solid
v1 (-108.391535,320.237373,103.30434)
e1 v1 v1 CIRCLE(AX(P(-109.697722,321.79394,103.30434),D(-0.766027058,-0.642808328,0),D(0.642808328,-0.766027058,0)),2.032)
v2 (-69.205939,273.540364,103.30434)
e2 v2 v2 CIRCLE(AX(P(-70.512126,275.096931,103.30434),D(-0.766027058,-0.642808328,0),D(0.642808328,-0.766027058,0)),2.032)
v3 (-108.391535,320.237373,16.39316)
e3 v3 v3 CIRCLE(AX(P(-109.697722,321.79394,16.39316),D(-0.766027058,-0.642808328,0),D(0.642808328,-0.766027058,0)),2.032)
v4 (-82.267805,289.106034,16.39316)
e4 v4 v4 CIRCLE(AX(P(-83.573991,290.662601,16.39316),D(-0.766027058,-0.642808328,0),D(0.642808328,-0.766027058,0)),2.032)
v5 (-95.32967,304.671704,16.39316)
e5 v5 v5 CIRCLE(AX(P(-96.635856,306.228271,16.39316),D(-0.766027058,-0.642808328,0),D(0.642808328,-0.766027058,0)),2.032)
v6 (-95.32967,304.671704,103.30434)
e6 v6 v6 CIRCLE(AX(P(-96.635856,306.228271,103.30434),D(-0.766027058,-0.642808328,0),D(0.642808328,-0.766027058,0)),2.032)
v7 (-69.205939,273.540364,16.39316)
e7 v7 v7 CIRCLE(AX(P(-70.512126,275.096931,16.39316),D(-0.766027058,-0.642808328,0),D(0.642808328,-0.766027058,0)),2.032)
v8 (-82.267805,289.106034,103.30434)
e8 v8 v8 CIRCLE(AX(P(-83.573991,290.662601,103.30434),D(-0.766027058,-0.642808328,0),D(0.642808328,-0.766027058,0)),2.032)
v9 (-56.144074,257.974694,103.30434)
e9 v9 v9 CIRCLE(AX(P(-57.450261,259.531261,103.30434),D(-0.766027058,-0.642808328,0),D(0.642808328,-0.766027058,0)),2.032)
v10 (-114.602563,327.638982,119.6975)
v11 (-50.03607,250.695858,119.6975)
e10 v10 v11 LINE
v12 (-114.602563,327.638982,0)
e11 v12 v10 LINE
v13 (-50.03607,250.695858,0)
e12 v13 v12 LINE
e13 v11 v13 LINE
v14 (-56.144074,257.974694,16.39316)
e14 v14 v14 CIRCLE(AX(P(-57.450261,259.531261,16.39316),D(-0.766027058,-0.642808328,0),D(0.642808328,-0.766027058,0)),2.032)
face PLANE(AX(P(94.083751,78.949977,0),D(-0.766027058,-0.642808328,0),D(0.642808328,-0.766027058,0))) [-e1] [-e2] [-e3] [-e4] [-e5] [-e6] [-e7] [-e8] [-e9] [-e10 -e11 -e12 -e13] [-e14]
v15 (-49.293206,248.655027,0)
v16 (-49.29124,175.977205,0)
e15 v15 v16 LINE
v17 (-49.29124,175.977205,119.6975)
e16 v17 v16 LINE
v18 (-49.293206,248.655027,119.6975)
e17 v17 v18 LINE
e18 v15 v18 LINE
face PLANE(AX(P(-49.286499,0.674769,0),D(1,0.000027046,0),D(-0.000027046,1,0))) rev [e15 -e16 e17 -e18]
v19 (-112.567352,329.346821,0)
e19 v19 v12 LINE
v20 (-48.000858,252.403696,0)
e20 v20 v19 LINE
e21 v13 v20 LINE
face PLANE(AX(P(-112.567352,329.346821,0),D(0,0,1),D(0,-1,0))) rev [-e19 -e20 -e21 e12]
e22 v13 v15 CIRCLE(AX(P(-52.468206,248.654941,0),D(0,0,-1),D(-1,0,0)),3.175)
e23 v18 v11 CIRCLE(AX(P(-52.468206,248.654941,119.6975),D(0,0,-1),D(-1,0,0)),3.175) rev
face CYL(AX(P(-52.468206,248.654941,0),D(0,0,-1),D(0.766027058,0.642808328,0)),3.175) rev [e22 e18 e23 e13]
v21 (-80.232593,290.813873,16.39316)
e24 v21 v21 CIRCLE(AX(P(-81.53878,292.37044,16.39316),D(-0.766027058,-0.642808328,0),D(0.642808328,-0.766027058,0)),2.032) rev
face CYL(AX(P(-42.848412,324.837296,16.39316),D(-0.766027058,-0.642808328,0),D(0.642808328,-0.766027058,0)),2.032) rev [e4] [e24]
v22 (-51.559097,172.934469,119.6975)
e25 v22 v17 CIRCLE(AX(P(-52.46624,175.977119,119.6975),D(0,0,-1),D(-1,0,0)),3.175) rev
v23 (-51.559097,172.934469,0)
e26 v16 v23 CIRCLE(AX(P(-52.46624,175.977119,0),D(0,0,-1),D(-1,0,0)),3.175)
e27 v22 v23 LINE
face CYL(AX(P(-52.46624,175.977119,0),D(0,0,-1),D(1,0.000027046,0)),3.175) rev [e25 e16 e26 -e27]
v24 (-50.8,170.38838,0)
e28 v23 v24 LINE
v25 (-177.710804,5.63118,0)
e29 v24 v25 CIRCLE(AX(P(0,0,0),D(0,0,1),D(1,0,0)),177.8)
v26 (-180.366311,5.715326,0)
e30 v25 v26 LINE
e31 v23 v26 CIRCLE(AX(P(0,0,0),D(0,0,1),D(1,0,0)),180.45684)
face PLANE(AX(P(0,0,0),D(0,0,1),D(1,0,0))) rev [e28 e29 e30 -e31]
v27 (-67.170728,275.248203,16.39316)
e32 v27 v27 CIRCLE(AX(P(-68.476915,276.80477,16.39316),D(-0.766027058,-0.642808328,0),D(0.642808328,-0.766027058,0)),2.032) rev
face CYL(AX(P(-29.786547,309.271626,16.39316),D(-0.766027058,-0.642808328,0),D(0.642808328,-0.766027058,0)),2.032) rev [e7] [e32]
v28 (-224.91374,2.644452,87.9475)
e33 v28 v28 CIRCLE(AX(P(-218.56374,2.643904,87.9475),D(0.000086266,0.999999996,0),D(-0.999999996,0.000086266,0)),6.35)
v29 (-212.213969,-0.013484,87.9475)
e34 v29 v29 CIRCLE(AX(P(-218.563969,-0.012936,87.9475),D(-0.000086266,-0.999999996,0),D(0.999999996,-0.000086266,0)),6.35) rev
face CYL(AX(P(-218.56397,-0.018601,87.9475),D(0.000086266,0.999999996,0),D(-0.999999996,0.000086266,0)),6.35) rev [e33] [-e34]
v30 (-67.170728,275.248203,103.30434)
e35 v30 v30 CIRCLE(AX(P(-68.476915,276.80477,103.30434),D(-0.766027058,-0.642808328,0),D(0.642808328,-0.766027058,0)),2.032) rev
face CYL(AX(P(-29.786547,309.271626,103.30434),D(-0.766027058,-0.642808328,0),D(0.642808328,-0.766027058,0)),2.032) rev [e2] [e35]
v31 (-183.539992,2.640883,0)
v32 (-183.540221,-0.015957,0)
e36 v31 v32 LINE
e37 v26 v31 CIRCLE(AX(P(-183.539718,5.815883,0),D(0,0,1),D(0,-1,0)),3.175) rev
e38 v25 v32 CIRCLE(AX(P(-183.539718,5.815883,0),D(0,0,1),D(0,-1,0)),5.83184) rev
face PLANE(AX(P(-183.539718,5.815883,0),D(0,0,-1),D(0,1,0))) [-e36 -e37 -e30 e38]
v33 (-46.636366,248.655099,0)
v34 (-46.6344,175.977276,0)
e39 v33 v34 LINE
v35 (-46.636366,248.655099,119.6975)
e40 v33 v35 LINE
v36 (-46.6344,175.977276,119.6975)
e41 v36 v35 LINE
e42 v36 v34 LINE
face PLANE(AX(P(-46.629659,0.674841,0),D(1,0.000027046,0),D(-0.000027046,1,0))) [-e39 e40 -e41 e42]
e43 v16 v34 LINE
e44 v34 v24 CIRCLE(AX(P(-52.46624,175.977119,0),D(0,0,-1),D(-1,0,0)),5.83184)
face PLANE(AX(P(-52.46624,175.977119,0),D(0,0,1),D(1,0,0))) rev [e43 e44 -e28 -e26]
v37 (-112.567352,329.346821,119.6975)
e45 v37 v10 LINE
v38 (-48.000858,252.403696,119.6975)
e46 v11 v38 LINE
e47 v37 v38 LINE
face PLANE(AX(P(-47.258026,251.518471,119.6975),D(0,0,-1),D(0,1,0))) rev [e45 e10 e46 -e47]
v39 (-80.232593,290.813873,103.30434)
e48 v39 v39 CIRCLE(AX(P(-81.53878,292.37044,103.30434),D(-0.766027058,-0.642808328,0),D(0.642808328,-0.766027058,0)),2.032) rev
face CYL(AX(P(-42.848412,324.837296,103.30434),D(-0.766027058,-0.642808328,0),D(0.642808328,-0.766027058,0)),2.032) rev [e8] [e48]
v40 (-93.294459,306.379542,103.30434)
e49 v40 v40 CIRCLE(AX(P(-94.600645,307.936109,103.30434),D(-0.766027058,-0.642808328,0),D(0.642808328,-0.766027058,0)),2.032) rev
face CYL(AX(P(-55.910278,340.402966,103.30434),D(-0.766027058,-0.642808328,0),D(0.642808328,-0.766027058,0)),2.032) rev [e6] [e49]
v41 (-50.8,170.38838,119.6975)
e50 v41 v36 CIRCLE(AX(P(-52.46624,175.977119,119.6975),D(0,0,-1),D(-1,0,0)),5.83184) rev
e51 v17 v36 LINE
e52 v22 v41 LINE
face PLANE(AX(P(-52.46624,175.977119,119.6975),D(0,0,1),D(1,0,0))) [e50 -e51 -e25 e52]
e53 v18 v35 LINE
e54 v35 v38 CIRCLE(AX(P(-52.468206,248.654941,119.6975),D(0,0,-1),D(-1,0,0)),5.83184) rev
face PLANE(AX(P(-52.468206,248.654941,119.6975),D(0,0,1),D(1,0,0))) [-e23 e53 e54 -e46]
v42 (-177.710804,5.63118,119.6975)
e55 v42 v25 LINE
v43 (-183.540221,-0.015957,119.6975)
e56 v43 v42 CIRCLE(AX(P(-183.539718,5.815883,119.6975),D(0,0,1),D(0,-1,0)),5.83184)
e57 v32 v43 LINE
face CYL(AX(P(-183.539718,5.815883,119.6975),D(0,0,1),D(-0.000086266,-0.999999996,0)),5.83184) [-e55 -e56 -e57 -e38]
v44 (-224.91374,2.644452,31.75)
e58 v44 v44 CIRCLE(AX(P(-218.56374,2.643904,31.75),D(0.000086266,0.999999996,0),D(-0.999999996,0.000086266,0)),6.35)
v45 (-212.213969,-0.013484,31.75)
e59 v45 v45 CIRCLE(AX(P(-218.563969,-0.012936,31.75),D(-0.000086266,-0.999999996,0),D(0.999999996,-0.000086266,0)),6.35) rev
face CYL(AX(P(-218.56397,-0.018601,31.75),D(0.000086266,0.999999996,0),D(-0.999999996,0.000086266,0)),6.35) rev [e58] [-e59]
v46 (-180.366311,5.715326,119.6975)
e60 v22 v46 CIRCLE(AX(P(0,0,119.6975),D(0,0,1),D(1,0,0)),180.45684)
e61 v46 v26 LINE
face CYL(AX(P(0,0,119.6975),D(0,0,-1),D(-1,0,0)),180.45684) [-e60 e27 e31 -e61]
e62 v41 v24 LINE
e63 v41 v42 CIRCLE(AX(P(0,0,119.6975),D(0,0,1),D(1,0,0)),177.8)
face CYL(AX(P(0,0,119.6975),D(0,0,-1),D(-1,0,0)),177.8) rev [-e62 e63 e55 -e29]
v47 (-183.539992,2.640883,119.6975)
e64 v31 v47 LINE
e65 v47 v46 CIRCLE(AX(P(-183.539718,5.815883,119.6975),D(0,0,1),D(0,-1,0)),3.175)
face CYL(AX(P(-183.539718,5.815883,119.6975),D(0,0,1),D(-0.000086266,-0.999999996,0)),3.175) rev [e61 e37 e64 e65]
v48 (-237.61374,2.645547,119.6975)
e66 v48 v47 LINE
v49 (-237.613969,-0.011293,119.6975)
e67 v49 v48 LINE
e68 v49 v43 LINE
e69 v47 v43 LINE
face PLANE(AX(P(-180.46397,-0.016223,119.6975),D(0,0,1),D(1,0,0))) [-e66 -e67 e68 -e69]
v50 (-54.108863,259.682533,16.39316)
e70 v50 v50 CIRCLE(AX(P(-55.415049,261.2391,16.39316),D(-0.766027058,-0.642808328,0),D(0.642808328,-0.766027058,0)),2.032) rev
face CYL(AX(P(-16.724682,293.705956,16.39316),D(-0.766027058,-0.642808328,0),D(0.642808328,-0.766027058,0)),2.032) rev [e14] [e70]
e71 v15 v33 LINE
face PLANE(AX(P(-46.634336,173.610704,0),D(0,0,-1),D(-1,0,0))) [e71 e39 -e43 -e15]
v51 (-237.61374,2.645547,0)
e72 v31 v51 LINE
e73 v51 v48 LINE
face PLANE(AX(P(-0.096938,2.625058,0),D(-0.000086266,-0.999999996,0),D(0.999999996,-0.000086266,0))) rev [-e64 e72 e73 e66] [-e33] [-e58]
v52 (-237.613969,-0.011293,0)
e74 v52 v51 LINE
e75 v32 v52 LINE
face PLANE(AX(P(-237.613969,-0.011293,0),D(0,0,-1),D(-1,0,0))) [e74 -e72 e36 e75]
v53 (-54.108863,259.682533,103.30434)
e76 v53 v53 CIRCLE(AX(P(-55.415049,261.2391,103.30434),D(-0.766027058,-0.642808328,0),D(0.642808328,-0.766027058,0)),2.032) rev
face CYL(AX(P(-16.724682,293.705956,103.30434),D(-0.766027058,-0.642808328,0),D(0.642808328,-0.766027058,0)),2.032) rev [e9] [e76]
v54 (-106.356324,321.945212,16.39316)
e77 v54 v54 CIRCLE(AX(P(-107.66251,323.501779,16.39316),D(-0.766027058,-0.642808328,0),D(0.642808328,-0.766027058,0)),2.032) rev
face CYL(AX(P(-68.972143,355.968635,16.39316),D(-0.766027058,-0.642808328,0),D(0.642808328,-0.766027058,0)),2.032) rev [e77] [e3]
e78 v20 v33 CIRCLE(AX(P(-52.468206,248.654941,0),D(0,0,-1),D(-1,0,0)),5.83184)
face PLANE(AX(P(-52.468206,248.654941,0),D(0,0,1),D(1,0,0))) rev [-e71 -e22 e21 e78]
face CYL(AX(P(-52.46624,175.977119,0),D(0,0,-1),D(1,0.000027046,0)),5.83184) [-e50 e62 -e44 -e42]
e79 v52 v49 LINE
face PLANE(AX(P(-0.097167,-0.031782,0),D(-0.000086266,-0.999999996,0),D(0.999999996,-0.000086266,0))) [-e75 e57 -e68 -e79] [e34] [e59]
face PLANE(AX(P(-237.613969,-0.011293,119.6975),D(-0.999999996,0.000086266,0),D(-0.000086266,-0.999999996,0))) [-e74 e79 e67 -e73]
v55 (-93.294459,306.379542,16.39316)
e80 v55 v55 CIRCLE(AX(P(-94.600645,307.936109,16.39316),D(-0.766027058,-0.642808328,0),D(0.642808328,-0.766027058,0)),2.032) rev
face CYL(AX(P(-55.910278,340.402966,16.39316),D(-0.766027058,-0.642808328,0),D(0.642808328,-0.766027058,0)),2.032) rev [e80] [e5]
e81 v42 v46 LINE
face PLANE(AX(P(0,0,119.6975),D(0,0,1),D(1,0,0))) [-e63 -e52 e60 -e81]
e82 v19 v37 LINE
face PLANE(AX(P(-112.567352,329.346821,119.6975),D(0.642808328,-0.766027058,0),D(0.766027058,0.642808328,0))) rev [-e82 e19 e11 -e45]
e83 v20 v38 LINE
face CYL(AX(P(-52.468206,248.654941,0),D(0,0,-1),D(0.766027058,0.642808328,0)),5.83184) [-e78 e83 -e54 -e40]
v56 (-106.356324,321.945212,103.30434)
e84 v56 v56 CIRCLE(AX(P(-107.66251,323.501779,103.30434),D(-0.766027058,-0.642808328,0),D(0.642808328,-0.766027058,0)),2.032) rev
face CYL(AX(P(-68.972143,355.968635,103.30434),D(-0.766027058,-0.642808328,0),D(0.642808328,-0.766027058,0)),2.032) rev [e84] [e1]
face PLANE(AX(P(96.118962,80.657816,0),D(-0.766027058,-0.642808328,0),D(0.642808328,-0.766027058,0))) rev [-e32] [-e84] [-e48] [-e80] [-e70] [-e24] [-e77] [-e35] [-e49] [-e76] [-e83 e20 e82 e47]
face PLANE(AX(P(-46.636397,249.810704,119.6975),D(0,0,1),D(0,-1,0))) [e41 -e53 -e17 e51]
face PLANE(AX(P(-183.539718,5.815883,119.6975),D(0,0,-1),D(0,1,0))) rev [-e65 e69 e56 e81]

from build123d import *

# Parameters (mm, degrees)
BASE_FLANGE1_DEPTH           = 119.6975
EDGE_FLANGE1_DEPTH           = 119.6975
EDGE_FLANGE2_STRIP_CUT_DEPTH = 119.6975
EDGE_FLANGE2_DEPTH           = 119.6975
EDGE_FLANGE3_DEPTH           = 119.6975
SKETCH20_R                   = 6.35
CUT_EXTRUDE1_DEPTH           = 2.65684
SKETCH21_R                   = 2.032
CUT_EXTRUDE2_DEPTH           = 2.65684


# Sheet-metal steps are written as plain solids
with BuildPart() as part:
    # Sketch1 → Base-Flange1 (new body)
    with BuildSketch(Plane.XY):
        with BuildLine():
            ThreePointArc((-50.8, 170.388379885), (-140.856418383, 108.500273734), (-177.710803869, 5.63118))
            Line((-177.710803869, 5.63118), (-180.366311024, 5.715325918))
            ThreePointArc((-180.366311024, 5.715325918), (-142.961215721, 110.121577824), (-51.559097143, 172.934469105))
            Line((-51.559097143, 172.934469105), (-50.8, 170.388379885))
        make_face()
    extrude(amount=BASE_FLANGE1_DEPTH)

    # Edge-Flange1 section (across the edge) → Edge-Flange1 (add)
    with BuildSketch(Plane(origin=(-49.291175996, 173.610632552, 119.6975), x_dir=(-0.9999999996342678, -2.7045604981568168e-05, 0), z_dir=(0, 0, -1))):
        with BuildLine():
            Line((-2.65684, 2.366572064), (-2.65684, 76.2))
            Line((-2.65684, 76.2), (0, 76.2))
            Line((0, 76.2), (0, 2.366572064))
            ThreePointArc((0, 2.366572064), (0.62936233, 0.469112223), (2.267939433, -0.676102109))
            Line((2.267939433, -0.676102109), (1.508911151, -3.222211858))
            ThreePointArc((1.508911151, -3.222211858), (-1.500827273, -1.118682173), (-2.65684, 2.366572064))
        make_face()
    extrude(amount=EDGE_FLANGE1_DEPTH)

    # Edge-Flange2 strip (across the edge) → Edge-Flange2 strip cut (cut)
    with BuildSketch(Plane(origin=(-49.293236871, 249.810632524, 119.6975), x_dir=(-0.7660270582590358, -0.6428083275868537, 0), z_dir=(0, 0, -1))):
        Polygon((-12.205285278, 10.412383287), (-1.292448625, -2.593029), (0.742808893, -0.885245167), (-10.17002776, 12.12016712), align=None)
    extrude(amount=EDGE_FLANGE2_STRIP_CUT_DEPTH, mode=Mode.SUBTRACT)

    # Edge-Flange2 section (across the edge) → Edge-Flange2 (add)
    with BuildSketch(Plane(origin=(-49.293236871, 249.810632524, 119.6975), x_dir=(-0.7660270582590358, -0.6428083275868537, 0), z_dir=(0, 0, -1))):
        with BuildLine():
            Line((-2.65684, 1.155605494), (-2.65684, 101.6))
            Line((-2.65684, 101.6), (0, 101.6))
            Line((0, 101.6), (0, 1.155605494))
            ThreePointArc((0, 1.155605494), (0.191475929, 0.069691539), (0.742808893, -0.885245167))
            Line((0.742808893, -0.885245167), (-1.292448625, -2.593029))
            ThreePointArc((-1.292448625, -2.593029), (-2.305137014, -0.839001259), (-2.65684, 1.155605494))
        make_face()
    extrude(amount=EDGE_FLANGE2_DEPTH)

    # Edge-Flange3 section (across the edge) → Edge-Flange3 (add)
    with BuildSketch(Plane(origin=(-180.463740314, 2.640617339, 0), x_dir=(8.626632785421055e-05, 0.9999999962790604, 0), z_dir=(0, 0, 1))):
        with BuildLine():
            Line((-2.65684, 3.076251829), (-2.65684, 57.15))
            Line((-2.65684, 57.15), (0, 57.15))
            Line((0, 57.15), (0, 3.076251829))
            ThreePointArc((0, 3.076251829), (0.894756196, 0.86692768), (3.074716973, -0.097164046))
            Line((3.074716973, -0.097164046), (2.990800136, -2.75267845))
            ThreePointArc((2.990800136, -2.75267845), (-1.013351819, -0.981834768), (-2.65684, 3.076251829))
        make_face()
    extrude(amount=EDGE_FLANGE3_DEPTH)

    # Sketch20 → Cut-Extrude1 (cut)
    with BuildSketch(Plane(origin=(0.000226453, 2.625049375, 0), x_dir=(0.9999999962790604, -8.626632785420363e-05, 0), z_dir=(8.626632785420363e-05, 0.9999999962790604, 0))):
        with Locations(Location((-218.563967439, -31.75, 0), (0, 0, 180))):
            Circle(SKETCH20_R)
        with Locations(Location((-218.563967439, -87.9475, 0), (0, 0, 180))):
            Circle(SKETCH20_R)
    extrude(amount=-CUT_EXTRUDE1_DEPTH, mode=Mode.SUBTRACT)

    # Sketch21 → Cut-Extrude2 (cut)
    with BuildSketch(Plane(origin=(94.083750988, 78.949976994, 0), x_dir=(0, 0, 1), z_dir=(-0.7660270582590358, -0.6428083275868537, 0))):
        with Locations(Location((103.30434, 317.017474478, 0), (0, 0, 270))):
            Circle(SKETCH21_R)
        with Locations(Location((103.30434, 296.697474478, 0), (0, 0, 270))):
            Circle(SKETCH21_R)
        with Locations(Location((103.30434, 276.377474478, 0), (0, 0, 270))):
            Circle(SKETCH21_R)
        with Locations(Location((103.30434, 256.057474478, 0), (0, 0, 270))):
            Circle(SKETCH21_R)
        with Locations(Location((103.30434, 235.737474478, 0), (0, 0, 270))):
            Circle(SKETCH21_R)
        with Locations(Location((16.39316, 235.737474478, 0), (0, 0, 270))):
            Circle(SKETCH21_R)
        with Locations(Location((16.39316, 256.057474478, 0), (0, 0, 270))):
            Circle(SKETCH21_R)
        with Locations(Location((16.39316, 276.377474478, 0), (0, 0, 270))):
            Circle(SKETCH21_R)
        with Locations(Location((16.39316, 296.697474478, 0), (0, 0, 270))):
            Circle(SKETCH21_R)
        with Locations(Location((16.39316, 317.017474478, 0), (0, 0, 270))):
            Circle(SKETCH21_R)
    extrude(amount=-CUT_EXTRUDE2_DEPTH, mode=Mode.SUBTRACT)


solid = part.part
